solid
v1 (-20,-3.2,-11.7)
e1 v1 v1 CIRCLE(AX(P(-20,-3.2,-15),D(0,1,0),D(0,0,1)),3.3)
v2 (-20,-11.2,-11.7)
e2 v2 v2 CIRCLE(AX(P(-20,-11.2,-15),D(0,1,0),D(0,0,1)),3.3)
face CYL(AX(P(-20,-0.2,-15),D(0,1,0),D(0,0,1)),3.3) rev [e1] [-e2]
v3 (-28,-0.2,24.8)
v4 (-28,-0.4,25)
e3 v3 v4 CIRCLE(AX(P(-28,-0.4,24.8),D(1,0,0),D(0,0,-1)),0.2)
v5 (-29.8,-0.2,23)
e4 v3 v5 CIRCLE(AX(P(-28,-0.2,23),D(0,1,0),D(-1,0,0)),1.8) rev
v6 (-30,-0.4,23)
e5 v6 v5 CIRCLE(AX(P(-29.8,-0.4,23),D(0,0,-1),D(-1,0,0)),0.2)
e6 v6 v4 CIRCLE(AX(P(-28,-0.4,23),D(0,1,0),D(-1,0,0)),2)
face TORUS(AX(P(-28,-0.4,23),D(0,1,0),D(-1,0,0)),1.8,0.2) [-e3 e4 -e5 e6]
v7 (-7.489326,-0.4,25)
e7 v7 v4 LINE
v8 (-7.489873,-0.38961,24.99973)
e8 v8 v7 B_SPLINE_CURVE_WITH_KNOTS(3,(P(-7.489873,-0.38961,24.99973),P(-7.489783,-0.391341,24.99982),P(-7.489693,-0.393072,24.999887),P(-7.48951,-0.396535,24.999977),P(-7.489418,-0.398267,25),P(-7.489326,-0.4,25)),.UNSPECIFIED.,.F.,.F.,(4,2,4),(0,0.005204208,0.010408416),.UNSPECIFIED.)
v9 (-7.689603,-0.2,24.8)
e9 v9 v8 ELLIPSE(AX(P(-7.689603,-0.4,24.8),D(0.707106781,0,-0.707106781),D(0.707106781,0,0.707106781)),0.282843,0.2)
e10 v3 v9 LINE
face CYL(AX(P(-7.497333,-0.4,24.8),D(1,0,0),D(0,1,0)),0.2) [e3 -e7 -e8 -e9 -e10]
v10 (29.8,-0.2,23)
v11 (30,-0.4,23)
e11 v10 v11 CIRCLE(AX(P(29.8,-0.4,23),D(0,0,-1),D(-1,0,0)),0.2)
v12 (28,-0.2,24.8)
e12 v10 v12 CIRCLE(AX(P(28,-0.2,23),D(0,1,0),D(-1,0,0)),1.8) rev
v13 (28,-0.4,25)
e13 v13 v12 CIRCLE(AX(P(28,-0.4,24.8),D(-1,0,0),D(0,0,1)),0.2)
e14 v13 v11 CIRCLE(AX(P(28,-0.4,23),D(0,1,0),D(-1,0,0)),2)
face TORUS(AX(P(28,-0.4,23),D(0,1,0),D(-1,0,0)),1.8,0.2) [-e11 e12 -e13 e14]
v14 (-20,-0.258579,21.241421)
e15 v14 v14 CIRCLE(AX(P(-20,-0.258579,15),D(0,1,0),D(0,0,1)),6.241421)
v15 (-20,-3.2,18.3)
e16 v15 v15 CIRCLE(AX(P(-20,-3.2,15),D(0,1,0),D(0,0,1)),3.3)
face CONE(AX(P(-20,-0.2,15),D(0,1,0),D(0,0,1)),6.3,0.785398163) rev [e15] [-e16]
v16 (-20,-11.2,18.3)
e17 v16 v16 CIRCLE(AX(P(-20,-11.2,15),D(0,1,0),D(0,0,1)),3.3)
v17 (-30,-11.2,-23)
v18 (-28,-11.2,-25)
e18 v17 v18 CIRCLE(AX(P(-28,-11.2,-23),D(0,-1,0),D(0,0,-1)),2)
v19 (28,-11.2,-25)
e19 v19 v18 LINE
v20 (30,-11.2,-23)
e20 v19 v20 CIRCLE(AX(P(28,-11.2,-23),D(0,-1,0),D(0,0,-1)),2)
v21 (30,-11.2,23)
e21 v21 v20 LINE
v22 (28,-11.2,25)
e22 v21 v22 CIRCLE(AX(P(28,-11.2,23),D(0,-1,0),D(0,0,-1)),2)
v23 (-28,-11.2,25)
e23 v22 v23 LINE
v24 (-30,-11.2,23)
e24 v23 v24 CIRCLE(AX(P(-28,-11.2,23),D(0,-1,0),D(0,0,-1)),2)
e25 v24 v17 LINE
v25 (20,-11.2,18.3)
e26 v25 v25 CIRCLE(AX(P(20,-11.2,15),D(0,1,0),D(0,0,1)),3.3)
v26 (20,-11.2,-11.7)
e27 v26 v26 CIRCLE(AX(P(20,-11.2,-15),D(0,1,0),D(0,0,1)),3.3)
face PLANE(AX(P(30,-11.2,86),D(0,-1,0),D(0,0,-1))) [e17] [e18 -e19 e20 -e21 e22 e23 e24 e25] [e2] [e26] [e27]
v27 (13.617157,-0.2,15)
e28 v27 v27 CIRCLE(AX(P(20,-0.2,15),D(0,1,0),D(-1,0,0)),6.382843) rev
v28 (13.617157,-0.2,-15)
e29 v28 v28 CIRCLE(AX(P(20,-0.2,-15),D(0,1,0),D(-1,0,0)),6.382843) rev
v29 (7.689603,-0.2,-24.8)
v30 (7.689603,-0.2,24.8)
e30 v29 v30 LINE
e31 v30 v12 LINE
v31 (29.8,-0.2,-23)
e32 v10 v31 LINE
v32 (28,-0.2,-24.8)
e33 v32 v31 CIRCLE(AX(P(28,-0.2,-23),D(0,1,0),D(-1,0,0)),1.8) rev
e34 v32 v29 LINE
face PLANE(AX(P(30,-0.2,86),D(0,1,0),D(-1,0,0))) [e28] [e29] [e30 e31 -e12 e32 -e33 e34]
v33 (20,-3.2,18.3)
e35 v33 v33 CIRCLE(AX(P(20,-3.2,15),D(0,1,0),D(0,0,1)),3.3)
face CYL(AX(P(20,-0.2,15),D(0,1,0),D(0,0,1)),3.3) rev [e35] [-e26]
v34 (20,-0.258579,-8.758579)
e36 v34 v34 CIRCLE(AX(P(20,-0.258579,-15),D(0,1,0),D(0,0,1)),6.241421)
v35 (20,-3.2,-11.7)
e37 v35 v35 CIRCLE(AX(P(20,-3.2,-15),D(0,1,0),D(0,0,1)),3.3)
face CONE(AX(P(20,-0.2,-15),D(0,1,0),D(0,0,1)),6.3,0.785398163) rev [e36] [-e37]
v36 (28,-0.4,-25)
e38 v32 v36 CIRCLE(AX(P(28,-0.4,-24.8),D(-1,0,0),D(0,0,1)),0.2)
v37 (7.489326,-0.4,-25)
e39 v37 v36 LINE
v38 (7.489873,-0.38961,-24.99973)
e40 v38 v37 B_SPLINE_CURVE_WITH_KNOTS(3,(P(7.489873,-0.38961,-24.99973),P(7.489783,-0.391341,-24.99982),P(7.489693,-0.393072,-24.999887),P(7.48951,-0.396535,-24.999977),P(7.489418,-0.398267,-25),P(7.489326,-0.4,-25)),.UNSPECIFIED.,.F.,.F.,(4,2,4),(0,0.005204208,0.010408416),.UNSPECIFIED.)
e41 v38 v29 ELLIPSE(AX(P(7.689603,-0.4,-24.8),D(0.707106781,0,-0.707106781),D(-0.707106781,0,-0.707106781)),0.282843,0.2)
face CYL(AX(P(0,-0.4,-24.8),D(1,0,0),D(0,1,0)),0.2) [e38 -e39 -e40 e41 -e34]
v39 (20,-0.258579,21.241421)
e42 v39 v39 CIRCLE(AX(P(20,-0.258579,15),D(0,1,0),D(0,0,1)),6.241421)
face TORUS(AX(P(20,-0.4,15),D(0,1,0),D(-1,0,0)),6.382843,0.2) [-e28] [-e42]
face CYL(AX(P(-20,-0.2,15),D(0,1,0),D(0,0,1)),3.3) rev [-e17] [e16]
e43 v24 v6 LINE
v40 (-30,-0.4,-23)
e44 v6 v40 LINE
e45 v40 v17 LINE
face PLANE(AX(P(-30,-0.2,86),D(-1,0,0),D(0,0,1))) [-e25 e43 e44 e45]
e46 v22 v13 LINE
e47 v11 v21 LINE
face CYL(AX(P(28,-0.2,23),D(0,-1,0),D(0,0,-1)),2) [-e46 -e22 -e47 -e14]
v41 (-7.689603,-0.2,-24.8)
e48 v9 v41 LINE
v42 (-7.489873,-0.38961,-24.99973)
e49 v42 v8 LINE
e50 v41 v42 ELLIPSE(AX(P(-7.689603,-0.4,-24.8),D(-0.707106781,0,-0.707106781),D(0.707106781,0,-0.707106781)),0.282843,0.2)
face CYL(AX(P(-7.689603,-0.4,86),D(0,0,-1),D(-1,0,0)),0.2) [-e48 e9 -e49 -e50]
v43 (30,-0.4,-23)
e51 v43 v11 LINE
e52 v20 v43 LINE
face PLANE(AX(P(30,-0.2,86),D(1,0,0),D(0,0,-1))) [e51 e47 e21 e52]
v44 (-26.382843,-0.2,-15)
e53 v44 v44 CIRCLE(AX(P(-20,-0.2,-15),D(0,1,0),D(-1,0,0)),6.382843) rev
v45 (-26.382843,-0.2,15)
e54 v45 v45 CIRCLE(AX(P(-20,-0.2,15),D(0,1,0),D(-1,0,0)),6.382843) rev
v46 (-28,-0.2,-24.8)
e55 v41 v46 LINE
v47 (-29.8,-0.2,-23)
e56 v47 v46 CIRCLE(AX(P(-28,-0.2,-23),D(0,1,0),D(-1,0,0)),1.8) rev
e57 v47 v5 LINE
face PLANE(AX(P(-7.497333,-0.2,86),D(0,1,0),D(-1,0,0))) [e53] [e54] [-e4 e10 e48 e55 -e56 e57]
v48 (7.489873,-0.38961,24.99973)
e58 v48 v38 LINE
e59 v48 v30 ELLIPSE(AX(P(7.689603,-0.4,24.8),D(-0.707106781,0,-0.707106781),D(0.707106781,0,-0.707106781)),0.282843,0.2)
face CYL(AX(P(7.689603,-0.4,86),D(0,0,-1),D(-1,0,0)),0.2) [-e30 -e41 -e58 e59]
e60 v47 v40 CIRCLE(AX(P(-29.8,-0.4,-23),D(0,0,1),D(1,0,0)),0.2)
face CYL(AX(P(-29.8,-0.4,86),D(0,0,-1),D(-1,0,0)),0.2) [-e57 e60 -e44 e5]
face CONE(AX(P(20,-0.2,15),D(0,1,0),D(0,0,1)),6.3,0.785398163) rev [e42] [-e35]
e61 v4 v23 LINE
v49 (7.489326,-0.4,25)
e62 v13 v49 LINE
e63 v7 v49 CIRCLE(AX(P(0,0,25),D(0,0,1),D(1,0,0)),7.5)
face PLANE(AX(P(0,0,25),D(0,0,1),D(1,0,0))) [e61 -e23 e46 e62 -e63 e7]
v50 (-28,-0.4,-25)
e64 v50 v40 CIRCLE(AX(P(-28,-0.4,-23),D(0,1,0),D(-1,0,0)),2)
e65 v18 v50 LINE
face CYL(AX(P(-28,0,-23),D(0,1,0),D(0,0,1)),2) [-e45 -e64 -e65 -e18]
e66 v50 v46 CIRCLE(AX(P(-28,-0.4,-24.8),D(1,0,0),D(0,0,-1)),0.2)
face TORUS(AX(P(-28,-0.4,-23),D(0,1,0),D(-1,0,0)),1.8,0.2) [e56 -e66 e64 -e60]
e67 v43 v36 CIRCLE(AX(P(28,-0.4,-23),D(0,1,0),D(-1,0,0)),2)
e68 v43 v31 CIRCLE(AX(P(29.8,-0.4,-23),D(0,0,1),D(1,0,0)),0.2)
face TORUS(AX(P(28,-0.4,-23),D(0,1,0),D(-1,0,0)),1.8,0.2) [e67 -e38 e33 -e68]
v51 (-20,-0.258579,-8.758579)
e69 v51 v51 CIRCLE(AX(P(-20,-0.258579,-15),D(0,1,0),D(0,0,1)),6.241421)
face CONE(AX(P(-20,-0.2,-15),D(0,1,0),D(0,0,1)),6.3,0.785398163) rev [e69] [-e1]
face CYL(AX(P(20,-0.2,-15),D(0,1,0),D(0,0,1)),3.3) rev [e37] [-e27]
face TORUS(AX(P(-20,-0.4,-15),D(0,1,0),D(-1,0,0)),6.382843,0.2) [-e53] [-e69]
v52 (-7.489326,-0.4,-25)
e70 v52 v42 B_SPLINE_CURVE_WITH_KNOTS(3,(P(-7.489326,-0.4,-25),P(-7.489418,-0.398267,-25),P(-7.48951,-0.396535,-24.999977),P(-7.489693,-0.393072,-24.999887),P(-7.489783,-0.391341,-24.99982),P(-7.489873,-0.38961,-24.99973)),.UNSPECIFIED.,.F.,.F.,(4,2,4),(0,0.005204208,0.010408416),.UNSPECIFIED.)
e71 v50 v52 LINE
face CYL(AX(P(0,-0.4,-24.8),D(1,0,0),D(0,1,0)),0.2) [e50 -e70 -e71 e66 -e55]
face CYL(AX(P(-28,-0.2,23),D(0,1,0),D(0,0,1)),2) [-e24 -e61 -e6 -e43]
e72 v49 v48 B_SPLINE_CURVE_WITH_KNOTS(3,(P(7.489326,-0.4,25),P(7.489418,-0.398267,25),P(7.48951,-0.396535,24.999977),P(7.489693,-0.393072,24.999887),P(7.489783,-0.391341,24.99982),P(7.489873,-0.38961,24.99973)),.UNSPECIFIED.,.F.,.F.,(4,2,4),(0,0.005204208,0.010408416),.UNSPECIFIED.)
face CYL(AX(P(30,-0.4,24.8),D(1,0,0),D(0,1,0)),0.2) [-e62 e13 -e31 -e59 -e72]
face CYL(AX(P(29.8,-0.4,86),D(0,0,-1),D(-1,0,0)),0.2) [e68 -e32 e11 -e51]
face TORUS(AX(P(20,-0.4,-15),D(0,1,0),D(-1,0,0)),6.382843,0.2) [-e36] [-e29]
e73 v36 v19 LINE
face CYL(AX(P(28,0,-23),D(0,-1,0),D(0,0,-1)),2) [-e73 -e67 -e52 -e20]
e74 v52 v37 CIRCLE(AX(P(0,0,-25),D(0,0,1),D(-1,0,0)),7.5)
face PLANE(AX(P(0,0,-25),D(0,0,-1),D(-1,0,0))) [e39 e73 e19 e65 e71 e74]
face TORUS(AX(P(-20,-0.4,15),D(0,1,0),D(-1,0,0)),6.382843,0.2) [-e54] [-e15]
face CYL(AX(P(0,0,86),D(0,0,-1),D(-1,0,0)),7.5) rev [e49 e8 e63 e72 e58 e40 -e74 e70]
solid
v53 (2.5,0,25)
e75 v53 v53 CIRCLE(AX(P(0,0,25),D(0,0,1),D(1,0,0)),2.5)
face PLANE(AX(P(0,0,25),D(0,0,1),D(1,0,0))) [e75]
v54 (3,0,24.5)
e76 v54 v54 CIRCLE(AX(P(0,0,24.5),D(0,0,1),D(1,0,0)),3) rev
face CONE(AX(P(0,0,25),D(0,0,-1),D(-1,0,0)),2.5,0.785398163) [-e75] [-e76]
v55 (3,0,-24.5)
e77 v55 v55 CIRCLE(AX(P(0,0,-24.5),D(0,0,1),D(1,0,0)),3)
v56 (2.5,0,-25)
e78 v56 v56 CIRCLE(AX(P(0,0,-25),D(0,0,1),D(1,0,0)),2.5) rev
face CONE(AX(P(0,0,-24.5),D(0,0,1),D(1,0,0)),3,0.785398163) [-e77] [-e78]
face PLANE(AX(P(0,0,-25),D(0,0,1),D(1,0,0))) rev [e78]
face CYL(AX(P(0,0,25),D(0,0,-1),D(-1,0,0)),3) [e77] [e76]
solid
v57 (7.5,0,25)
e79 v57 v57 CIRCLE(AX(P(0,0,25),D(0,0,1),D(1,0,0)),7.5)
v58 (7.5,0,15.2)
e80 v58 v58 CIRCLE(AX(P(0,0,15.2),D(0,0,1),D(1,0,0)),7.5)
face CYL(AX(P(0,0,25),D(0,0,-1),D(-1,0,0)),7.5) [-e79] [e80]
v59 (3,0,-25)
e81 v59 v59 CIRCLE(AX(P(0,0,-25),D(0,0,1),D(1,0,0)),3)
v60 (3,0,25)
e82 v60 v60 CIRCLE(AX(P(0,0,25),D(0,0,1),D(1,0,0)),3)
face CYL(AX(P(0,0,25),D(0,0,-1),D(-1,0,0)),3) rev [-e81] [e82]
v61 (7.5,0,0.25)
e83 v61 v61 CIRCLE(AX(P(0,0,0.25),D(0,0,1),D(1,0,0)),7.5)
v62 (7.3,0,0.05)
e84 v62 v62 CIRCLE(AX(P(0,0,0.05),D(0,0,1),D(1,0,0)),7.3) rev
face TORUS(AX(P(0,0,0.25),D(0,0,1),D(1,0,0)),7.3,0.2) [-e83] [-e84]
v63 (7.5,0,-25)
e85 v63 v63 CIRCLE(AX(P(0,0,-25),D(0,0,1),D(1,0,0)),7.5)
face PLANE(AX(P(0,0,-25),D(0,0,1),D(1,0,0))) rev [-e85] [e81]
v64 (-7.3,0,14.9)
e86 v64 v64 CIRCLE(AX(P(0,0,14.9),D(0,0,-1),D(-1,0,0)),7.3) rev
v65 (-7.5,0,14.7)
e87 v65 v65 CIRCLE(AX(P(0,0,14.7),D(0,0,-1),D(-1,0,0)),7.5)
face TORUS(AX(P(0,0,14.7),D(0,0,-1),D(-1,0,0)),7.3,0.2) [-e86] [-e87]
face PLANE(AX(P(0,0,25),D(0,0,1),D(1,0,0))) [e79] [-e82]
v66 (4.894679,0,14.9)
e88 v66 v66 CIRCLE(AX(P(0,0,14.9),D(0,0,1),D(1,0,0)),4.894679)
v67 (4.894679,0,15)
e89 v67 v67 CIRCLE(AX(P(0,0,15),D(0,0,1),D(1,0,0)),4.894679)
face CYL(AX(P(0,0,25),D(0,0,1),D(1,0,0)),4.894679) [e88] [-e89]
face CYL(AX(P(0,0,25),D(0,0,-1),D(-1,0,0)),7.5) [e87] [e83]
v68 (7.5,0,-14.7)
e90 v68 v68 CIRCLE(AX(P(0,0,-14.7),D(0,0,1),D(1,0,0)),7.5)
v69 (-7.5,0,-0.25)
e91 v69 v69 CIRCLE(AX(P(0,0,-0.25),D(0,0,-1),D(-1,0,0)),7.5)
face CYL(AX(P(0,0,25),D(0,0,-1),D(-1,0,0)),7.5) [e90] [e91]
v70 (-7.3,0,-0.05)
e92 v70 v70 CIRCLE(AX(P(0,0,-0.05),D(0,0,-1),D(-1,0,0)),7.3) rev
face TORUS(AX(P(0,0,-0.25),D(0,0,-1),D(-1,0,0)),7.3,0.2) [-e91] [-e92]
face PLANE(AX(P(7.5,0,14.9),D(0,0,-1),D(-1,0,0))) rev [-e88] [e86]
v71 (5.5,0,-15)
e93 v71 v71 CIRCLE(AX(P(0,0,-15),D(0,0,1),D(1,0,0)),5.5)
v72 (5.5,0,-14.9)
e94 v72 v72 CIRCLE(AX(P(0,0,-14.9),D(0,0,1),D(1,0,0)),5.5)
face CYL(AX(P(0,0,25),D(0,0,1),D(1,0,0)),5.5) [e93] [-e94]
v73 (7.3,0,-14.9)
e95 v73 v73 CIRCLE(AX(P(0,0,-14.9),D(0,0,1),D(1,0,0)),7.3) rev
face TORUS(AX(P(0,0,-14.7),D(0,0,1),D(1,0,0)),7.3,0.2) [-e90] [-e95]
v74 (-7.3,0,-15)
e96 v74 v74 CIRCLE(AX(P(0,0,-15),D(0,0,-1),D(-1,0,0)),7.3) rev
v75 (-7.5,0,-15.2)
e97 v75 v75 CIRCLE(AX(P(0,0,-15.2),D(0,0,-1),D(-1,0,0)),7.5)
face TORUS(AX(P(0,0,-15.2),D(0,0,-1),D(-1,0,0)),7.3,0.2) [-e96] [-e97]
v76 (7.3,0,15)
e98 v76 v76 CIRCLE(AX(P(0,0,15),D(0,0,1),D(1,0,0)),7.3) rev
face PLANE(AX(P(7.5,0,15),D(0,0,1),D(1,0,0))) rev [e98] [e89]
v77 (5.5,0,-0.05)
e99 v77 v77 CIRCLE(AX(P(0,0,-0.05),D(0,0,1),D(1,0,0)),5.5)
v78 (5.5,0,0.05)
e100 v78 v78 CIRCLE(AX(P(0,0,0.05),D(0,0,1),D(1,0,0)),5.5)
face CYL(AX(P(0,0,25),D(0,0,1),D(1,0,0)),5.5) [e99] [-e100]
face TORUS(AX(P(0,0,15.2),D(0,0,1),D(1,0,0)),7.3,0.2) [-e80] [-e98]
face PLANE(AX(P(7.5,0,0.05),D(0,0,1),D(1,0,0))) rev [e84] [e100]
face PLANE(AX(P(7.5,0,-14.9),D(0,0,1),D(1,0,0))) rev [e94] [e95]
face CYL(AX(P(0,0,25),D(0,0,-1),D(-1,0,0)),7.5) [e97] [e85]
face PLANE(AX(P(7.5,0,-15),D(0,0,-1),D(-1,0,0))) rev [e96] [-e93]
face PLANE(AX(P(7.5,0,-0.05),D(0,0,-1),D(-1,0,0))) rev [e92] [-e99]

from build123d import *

# Parameters (mm, degrees)
SKETCH_1_R                  = 7.5
SKETCH_1_R_2                = 3
EXTRUDE_1_DEPTH             = 25
SKETCH_2_R                  = 3
EXTRUDE_2_DEPTH             = 25
CHAMFER_1_SIZE              = 0.5
SKETCH_3_W                  = 2
SKETCH_3_H                  = 0.1
SKETCH_3_W_2                = 2.605320606
FILLET_1_R                  = 0.2
EXTRUDE_6_DEPTH             = 50
HOLE_WIZARD_M6_1_AT_2_COUNT = 2
HOLE_WIZARD_M6_1_AT_2_PITCH = 40
HOLE_WIZARD_M6_1_AT_3_COUNT = 2
HOLE_WIZARD_M6_1_AT_3_PITCH = 30
HOLE_WIZARD_M6_1_AT_4_COUNT = 2
HOLE_WIZARD_M6_1_AT_4_PITCH = 50
FILLET_2_R                  = 0.2
FILLET_3_R                  = 2
CHAMFER_2_SIZE              = 0.5


with BuildPart() as part:
    # 草图1 → 凸台-拉伸1 (new, symmetric)
    with BuildSketch(Plane.XY):
        Circle(SKETCH_1_R)
        Circle(SKETCH_1_R_2, mode=Mode.SUBTRACT)
    extrude(amount=EXTRUDE_1_DEPTH, both=True)

    # 草图3 → 切除-旋转1 (revolve, cut)
    with BuildSketch(Plane(origin=(0, 0, 0), x_dir=(1, 0, 0), z_dir=(0, 1, 0))):
        with Locations((6.5, 14.95)):
            Rectangle(SKETCH_3_W, SKETCH_3_H)
        with Locations((6.5, 0)):
            Rectangle(SKETCH_3_W, SKETCH_3_H)
        with Locations((6.197339697, -14.95)):
            Rectangle(SKETCH_3_W_2, SKETCH_3_H)
    revolve(axis=Axis((0, 0, 25), (0, 0, -1)), mode=Mode.SUBTRACT)

    # 圆角1
    fillet_1_edges = [part.edges().sort_by_distance(p)[0] for p in [
        (-7.5, 0, -15),
        (-7.5, 0, -14.9),
        (-7.5, 0, -0.05),
        (-7.5, 0, 0.05),
        (-7.5, 0, 14.9),
        (-7.5, 0, 15),
    ]]
    fillet(fillet_1_edges, radius=FILLET_1_R)


with BuildPart() as body_2:
    # 草图2 → 凸台-拉伸2 (new, symmetric)
    with BuildSketch(Plane.XY):
        Circle(SKETCH_2_R)
    extrude(amount=EXTRUDE_2_DEPTH, both=True)

    # 倒角1
    chamfer_1_edges = [body_2.edges().sort_by_distance(p)[0] for p in [
        (-3, 0, 25),
    ]]
    chamfer(chamfer_1_edges, length=CHAMFER_1_SIZE)

    # 倒角2
    chamfer_2_edges = [body_2.edges().sort_by_distance(p)[0] for p in [
        (-3, 0, -25),
    ]]
    chamfer(chamfer_2_edges, length=CHAMFER_2_SIZE)


with BuildPart() as body_3:
    # 草图5 → 凸台-拉伸6 (new body)
    with BuildSketch(Plane(origin=(0, 0, -25), x_dir=(-1, 0, 0), z_dir=(0, 0, -1))):
        with BuildLine():
            Line((7.497332859, -0.2), (30, -0.2))
            Line((30, -0.2), (30, -11.2))
            Line((30, -11.2), (-30, -11.2))
            Line((-30, -11.2), (-30, -0.2))
            Line((-30, -0.2), (-7.497332859, -0.2))
            ThreePointArc((-7.497332859, -0.2), (0, -7.5), (7.497332859, -0.2))
        make_face()
    extrude(amount=-EXTRUDE_6_DEPTH)

    # 草图6 → M6 平头机械螺钉的锥形沉头孔1 (revolve, cut)
    with BuildSketch(Plane(origin=(-20, -0.2, -15), x_dir=(0, 0, 1), z_dir=(1, 0, 0))):
        Polygon((0, 0), (0, 11), (3.3, 11), (3.3, 3), (6.3, 0), align=None)
    hole_wizard_m6_1 = revolve(axis=Axis((-20, 6.15, -15), (0, -1, 0)), mode=Mode.SUBTRACT)

    # M6 平头机械螺钉的锥形沉头孔1 at 2: M6 平头机械螺钉的锥形沉头孔1 ×2
    with Locations(*[(i * HOLE_WIZARD_M6_1_AT_2_PITCH, 0, 0) for i in range(1, HOLE_WIZARD_M6_1_AT_2_COUNT)]):
        add(hole_wizard_m6_1, mode=Mode.SUBTRACT)

    # M6 平头机械螺钉的锥形沉头孔1 at 3: M6 平头机械螺钉的锥形沉头孔1 ×2
    with Locations(*[(0, 0, i * HOLE_WIZARD_M6_1_AT_3_PITCH) for i in range(1, HOLE_WIZARD_M6_1_AT_3_COUNT)]):
        add(hole_wizard_m6_1, mode=Mode.SUBTRACT)

    # M6 平头机械螺钉的锥形沉头孔1 at 4: M6 平头机械螺钉的锥形沉头孔1 ×2
    with Locations(*[Vector(0.8, 0, 0.6) * (i * HOLE_WIZARD_M6_1_AT_4_PITCH) for i in range(1, HOLE_WIZARD_M6_1_AT_4_COUNT)]):
        add(hole_wizard_m6_1, mode=Mode.SUBTRACT)

    # 圆角2
    fillet_2_edges = [body_3.edges().sort_by_distance(p)[0] for p in [
        (-18.74866643, -0.2, -25),
        (20, -0.2, 8.7),
        (18.74866643, -0.2, -25),
        (-20, -0.2, 8.7),
        (-30, -0.2, 0),
        (-18.74866643, -0.2, 25),
        (20, -0.2, -21.3),
        (-7.497332859, -0.2, 0),
        (7.497332859, -0.2, 0),
        (18.74866643, -0.2, 25),
        (30, -0.2, 0),
        (-20, -0.2, -21.3),
    ]]
    fillet(fillet_2_edges, radius=FILLET_2_R)

    # 圆角3
    # the kernel refuses this fillet: 2 mm, written as the material it takes off along each edge
    with BuildSketch(Plane(origin=(28, -0.2, 23), x_dir=(0, 0, 1), z_dir=(-1, 0, 0))) as fillet_3_piece_1:
        with BuildLine():
            CenterArc((1.8, -0.2), 0.2, 0, 90)
            Line((2, -0.2), (2, 0))
            Line((2, 0), (1.8, 0))
        make_face()
    revolve(axis=Axis((28, -0.2, 23), (0, 1, 0)), revolution_arc=90, mode=Mode.SUBTRACT)
    with BuildSketch(Plane(origin=(28, -0.2, -23), x_dir=(1, 0, 0), z_dir=(0, 0, 1))) as fillet_3_piece_2:
        with BuildLine():
            CenterArc((1.8, -0.2), 0.2, 0, 90)
            Line((2, -0.2), (2, 0))
            Line((2, 0), (1.8, 0))
        make_face()
    revolve(axis=Axis((28, -0.2, -23), (0, 1, 0)), revolution_arc=90, mode=Mode.SUBTRACT)
    with BuildSketch(Plane(origin=(-28, -0.2, 23), x_dir=(-1, 0, 0), z_dir=(0, 0, -1))) as fillet_3_piece_3:
        with BuildLine():
            CenterArc((1.8, -0.2), 0.2, 0, 90)
            Line((2, -0.2), (2, 0))
            Line((2, 0), (1.8, 0))
        make_face()
    revolve(axis=Axis((-28, -0.2, 23), (0, 1, 0)), revolution_arc=90, mode=Mode.SUBTRACT)
    with BuildSketch(Plane(origin=(-28, -0.2, -23), x_dir=(0, 0, -1), z_dir=(1, 0, 0))) as fillet_3_piece_4:
        with BuildLine():
            CenterArc((1.8, -0.2), 0.2, 0, 90)
            Line((2, -0.2), (2, 0))
            Line((2, 0), (1.8, 0))
        make_face()
    revolve(axis=Axis((-28, -0.2, -23), (0, 1, 0)), revolution_arc=90, mode=Mode.SUBTRACT)
    with BuildSketch(Plane(origin=(-30, -0.2, -25), x_dir=(1, 0, 0), z_dir=(0, -1, 0)), Plane(origin=(-30, -0.2, 25), x_dir=(0, 0, -1), z_dir=(0, -1, 0)), Plane(origin=(30, -16.2, -25), x_dir=(-1, 0, 0), z_dir=(0, 1, 0))) as fillet_3_piece_5:
        with BuildLine():
            CenterArc((FILLET_3_R, FILLET_3_R), FILLET_3_R, 180, 90)
            Line((0, FILLET_3_R), (0, 0))
            Line((0, 0), (FILLET_3_R, 0))
        make_face()
    extrude(amount=16, mode=Mode.SUBTRACT)
    with BuildSketch(Plane(origin=(30, -16.2, 25), x_dir=(-1, 0, 0), z_dir=(0, 1, 0))) as fillet_3_piece_6:
        with BuildLine():
            CenterArc((FILLET_3_R, -FILLET_3_R), FILLET_3_R, 90, 90)
            Line((0, -FILLET_3_R), (0, 0))
            Line((0, 0), (FILLET_3_R, 0))
        make_face()
    extrude(amount=16, mode=Mode.SUBTRACT)


solid = Compound([part.part, body_2.part, body_3.part])
